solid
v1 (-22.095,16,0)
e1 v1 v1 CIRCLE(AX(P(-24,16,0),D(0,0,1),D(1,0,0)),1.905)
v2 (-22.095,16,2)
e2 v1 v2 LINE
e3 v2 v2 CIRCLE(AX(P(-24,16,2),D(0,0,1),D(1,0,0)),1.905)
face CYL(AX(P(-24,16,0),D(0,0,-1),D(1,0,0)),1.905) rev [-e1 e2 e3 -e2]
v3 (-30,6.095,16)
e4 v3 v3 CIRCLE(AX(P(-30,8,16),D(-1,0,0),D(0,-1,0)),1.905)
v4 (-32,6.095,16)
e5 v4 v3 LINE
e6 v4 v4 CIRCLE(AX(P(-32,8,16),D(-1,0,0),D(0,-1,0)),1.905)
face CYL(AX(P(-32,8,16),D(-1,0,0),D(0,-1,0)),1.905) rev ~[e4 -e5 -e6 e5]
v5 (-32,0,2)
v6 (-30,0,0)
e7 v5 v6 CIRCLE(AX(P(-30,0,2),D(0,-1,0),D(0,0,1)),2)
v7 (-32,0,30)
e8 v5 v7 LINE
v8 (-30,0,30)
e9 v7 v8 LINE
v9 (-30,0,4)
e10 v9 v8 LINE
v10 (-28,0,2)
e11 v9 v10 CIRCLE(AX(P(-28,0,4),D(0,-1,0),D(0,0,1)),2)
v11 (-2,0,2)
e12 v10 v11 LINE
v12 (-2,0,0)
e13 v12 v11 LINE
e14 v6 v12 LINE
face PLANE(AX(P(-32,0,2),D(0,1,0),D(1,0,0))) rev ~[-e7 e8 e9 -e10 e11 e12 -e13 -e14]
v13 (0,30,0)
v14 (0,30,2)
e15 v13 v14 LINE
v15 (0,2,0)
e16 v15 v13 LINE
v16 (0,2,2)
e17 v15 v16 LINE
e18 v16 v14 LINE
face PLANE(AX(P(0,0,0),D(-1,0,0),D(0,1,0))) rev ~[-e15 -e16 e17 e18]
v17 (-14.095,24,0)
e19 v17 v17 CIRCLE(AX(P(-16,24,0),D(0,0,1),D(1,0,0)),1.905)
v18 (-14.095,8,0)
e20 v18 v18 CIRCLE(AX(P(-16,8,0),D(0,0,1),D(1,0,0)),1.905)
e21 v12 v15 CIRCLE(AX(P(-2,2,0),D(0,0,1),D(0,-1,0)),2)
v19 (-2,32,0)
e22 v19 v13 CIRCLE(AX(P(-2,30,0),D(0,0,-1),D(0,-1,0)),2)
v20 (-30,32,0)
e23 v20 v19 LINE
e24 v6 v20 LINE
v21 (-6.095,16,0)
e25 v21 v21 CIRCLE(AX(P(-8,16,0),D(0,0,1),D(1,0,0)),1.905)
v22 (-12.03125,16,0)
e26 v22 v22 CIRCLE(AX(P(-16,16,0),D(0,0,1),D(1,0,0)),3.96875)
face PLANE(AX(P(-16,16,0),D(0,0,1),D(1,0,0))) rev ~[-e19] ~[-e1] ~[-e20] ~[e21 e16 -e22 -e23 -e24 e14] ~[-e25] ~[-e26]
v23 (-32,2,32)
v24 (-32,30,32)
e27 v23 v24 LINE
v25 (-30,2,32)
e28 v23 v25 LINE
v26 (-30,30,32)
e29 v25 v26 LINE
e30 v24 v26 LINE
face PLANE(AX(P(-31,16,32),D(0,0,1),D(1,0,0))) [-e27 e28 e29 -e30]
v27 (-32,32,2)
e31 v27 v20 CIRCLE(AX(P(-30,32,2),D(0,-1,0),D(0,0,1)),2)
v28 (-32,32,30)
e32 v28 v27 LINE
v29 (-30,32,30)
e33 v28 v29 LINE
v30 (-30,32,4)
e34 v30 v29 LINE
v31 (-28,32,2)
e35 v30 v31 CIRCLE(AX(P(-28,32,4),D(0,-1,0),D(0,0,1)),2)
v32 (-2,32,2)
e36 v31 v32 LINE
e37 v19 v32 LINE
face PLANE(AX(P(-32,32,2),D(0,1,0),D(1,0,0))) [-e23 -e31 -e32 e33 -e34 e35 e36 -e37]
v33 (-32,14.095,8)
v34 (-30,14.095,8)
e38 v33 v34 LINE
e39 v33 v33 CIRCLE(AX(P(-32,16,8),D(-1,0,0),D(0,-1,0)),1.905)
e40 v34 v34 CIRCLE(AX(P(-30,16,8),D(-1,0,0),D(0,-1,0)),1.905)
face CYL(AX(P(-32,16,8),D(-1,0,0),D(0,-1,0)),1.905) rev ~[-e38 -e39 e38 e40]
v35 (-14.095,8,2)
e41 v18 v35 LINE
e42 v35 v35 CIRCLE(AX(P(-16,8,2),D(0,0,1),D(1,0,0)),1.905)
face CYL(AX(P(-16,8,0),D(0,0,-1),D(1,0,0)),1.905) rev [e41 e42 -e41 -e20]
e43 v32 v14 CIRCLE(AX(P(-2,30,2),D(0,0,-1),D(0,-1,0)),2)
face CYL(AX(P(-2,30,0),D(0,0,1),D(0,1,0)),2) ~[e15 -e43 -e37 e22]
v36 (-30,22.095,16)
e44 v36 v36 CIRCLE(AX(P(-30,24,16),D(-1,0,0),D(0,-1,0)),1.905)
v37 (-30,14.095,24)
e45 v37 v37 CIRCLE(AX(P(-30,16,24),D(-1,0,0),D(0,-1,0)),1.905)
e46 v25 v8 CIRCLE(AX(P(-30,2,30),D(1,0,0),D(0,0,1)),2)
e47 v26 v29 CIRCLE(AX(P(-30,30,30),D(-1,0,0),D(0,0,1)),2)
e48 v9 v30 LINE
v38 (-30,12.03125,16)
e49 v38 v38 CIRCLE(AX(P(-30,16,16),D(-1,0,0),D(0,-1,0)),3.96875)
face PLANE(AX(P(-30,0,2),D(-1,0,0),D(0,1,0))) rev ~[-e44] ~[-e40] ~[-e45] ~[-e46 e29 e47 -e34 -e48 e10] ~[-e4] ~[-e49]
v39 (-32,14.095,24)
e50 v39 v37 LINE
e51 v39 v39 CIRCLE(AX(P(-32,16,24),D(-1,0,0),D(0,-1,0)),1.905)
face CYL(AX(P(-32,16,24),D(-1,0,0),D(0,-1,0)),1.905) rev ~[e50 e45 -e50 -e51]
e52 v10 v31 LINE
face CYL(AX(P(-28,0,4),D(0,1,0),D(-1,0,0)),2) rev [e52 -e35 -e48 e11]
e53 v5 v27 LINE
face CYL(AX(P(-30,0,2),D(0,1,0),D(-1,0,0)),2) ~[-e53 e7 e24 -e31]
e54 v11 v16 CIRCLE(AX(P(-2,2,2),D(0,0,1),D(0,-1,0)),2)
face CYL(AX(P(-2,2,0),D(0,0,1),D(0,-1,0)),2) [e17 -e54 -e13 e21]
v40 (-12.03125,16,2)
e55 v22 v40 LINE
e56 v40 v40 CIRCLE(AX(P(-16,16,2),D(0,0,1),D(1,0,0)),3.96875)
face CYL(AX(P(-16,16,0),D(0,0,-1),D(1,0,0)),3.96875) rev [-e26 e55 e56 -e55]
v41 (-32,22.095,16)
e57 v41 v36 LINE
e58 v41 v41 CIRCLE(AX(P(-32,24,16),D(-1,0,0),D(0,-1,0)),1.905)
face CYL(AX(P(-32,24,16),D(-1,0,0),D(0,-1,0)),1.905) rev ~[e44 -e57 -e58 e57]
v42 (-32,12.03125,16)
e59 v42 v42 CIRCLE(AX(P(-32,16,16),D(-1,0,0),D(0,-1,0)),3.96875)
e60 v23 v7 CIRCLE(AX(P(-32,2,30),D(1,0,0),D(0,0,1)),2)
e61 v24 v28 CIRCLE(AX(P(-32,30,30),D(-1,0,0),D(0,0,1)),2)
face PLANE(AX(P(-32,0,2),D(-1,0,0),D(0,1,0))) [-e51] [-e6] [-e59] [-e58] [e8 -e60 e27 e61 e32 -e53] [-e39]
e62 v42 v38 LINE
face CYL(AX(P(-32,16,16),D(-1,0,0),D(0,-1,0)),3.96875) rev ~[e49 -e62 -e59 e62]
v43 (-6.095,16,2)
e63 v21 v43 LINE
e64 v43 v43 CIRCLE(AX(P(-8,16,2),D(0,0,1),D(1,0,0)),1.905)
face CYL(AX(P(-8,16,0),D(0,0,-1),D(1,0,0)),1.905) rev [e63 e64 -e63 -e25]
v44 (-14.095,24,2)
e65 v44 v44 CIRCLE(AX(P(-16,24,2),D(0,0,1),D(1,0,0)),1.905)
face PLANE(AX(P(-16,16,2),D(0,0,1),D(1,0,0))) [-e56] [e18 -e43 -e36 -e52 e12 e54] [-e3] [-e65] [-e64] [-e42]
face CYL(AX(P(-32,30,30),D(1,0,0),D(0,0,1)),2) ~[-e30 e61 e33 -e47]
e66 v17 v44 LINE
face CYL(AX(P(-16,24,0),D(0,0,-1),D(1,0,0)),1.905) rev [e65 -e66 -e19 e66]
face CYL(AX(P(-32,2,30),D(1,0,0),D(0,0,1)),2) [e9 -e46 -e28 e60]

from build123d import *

# Parameters (mm, degrees)
F0_W     = 32
F0_H     = 32
F0_R     = 1.905
F0_R_2   = 3.96875
F1_DEPTH = 2
F2_W     = 2
F2_H     = 32
F3_DEPTH = 30
F4_R     = 3.96875
F4_R_2   = 1.905
F5_DEPTH = 2
F6_R     = 2


# Not quite as in the source:
# - a feature names something its author has since deleted; it is built from what else it names


with BuildPart() as f1:
    # F0 (on Top) → F1 (new body)
    with BuildSketch(Plane.XY):
        with Locations((-16, 16)):
            Rectangle(F0_W, F0_H)
        with Locations((-16, 8)):
            Circle(F0_R, mode=Mode.SUBTRACT)
        with Locations((-24, 16)):
            Circle(F0_R, mode=Mode.SUBTRACT)
        with Locations((-16, 16)):
            Circle(F0_R_2, mode=Mode.SUBTRACT)
        with Locations((-8, 16)):
            Circle(F0_R, mode=Mode.SUBTRACT)
        with Locations((-16, 24)):
            Circle(F0_R, mode=Mode.SUBTRACT)
    extrude(amount=F1_DEPTH)

    # F2 (on face) → F3 (join)
    with BuildSketch(Plane.XY.offset(2)):
        with Locations((-31, 16)):
            Rectangle(F2_W, F2_H)
    extrude(amount=F3_DEPTH)

    # F4 (on face) → F5 (cut, through all)
    with BuildSketch(Plane(origin=(-32, 0, 0), x_dir=(0, -1, 0), z_dir=(-1, 0, 0))):
        with Locations((-16, 16)):
            Circle(F4_R)
        with Locations((-16, 24)):
            Circle(F4_R_2)
        with Locations((-24, 16)):
            Circle(F4_R_2)
        with Locations((-16, 8)):
            Circle(F4_R_2)
        with Locations((-8, 16)):
            Circle(F4_R_2)
    extrude(amount=-F5_DEPTH, mode=Mode.SUBTRACT)

    # F6
    f6_edges = [f1.edges().sort_by_distance(p)[0] for p in [
        (-31, 0, 32),
        (-31, 32, 32),
        (0, 0, 1),
        (0, 32, 1),
        (-30, 16, 2),
        (-32, 16, 0),
    ]]
    fillet(f6_edges, radius=F6_R)


solid = f1.part
